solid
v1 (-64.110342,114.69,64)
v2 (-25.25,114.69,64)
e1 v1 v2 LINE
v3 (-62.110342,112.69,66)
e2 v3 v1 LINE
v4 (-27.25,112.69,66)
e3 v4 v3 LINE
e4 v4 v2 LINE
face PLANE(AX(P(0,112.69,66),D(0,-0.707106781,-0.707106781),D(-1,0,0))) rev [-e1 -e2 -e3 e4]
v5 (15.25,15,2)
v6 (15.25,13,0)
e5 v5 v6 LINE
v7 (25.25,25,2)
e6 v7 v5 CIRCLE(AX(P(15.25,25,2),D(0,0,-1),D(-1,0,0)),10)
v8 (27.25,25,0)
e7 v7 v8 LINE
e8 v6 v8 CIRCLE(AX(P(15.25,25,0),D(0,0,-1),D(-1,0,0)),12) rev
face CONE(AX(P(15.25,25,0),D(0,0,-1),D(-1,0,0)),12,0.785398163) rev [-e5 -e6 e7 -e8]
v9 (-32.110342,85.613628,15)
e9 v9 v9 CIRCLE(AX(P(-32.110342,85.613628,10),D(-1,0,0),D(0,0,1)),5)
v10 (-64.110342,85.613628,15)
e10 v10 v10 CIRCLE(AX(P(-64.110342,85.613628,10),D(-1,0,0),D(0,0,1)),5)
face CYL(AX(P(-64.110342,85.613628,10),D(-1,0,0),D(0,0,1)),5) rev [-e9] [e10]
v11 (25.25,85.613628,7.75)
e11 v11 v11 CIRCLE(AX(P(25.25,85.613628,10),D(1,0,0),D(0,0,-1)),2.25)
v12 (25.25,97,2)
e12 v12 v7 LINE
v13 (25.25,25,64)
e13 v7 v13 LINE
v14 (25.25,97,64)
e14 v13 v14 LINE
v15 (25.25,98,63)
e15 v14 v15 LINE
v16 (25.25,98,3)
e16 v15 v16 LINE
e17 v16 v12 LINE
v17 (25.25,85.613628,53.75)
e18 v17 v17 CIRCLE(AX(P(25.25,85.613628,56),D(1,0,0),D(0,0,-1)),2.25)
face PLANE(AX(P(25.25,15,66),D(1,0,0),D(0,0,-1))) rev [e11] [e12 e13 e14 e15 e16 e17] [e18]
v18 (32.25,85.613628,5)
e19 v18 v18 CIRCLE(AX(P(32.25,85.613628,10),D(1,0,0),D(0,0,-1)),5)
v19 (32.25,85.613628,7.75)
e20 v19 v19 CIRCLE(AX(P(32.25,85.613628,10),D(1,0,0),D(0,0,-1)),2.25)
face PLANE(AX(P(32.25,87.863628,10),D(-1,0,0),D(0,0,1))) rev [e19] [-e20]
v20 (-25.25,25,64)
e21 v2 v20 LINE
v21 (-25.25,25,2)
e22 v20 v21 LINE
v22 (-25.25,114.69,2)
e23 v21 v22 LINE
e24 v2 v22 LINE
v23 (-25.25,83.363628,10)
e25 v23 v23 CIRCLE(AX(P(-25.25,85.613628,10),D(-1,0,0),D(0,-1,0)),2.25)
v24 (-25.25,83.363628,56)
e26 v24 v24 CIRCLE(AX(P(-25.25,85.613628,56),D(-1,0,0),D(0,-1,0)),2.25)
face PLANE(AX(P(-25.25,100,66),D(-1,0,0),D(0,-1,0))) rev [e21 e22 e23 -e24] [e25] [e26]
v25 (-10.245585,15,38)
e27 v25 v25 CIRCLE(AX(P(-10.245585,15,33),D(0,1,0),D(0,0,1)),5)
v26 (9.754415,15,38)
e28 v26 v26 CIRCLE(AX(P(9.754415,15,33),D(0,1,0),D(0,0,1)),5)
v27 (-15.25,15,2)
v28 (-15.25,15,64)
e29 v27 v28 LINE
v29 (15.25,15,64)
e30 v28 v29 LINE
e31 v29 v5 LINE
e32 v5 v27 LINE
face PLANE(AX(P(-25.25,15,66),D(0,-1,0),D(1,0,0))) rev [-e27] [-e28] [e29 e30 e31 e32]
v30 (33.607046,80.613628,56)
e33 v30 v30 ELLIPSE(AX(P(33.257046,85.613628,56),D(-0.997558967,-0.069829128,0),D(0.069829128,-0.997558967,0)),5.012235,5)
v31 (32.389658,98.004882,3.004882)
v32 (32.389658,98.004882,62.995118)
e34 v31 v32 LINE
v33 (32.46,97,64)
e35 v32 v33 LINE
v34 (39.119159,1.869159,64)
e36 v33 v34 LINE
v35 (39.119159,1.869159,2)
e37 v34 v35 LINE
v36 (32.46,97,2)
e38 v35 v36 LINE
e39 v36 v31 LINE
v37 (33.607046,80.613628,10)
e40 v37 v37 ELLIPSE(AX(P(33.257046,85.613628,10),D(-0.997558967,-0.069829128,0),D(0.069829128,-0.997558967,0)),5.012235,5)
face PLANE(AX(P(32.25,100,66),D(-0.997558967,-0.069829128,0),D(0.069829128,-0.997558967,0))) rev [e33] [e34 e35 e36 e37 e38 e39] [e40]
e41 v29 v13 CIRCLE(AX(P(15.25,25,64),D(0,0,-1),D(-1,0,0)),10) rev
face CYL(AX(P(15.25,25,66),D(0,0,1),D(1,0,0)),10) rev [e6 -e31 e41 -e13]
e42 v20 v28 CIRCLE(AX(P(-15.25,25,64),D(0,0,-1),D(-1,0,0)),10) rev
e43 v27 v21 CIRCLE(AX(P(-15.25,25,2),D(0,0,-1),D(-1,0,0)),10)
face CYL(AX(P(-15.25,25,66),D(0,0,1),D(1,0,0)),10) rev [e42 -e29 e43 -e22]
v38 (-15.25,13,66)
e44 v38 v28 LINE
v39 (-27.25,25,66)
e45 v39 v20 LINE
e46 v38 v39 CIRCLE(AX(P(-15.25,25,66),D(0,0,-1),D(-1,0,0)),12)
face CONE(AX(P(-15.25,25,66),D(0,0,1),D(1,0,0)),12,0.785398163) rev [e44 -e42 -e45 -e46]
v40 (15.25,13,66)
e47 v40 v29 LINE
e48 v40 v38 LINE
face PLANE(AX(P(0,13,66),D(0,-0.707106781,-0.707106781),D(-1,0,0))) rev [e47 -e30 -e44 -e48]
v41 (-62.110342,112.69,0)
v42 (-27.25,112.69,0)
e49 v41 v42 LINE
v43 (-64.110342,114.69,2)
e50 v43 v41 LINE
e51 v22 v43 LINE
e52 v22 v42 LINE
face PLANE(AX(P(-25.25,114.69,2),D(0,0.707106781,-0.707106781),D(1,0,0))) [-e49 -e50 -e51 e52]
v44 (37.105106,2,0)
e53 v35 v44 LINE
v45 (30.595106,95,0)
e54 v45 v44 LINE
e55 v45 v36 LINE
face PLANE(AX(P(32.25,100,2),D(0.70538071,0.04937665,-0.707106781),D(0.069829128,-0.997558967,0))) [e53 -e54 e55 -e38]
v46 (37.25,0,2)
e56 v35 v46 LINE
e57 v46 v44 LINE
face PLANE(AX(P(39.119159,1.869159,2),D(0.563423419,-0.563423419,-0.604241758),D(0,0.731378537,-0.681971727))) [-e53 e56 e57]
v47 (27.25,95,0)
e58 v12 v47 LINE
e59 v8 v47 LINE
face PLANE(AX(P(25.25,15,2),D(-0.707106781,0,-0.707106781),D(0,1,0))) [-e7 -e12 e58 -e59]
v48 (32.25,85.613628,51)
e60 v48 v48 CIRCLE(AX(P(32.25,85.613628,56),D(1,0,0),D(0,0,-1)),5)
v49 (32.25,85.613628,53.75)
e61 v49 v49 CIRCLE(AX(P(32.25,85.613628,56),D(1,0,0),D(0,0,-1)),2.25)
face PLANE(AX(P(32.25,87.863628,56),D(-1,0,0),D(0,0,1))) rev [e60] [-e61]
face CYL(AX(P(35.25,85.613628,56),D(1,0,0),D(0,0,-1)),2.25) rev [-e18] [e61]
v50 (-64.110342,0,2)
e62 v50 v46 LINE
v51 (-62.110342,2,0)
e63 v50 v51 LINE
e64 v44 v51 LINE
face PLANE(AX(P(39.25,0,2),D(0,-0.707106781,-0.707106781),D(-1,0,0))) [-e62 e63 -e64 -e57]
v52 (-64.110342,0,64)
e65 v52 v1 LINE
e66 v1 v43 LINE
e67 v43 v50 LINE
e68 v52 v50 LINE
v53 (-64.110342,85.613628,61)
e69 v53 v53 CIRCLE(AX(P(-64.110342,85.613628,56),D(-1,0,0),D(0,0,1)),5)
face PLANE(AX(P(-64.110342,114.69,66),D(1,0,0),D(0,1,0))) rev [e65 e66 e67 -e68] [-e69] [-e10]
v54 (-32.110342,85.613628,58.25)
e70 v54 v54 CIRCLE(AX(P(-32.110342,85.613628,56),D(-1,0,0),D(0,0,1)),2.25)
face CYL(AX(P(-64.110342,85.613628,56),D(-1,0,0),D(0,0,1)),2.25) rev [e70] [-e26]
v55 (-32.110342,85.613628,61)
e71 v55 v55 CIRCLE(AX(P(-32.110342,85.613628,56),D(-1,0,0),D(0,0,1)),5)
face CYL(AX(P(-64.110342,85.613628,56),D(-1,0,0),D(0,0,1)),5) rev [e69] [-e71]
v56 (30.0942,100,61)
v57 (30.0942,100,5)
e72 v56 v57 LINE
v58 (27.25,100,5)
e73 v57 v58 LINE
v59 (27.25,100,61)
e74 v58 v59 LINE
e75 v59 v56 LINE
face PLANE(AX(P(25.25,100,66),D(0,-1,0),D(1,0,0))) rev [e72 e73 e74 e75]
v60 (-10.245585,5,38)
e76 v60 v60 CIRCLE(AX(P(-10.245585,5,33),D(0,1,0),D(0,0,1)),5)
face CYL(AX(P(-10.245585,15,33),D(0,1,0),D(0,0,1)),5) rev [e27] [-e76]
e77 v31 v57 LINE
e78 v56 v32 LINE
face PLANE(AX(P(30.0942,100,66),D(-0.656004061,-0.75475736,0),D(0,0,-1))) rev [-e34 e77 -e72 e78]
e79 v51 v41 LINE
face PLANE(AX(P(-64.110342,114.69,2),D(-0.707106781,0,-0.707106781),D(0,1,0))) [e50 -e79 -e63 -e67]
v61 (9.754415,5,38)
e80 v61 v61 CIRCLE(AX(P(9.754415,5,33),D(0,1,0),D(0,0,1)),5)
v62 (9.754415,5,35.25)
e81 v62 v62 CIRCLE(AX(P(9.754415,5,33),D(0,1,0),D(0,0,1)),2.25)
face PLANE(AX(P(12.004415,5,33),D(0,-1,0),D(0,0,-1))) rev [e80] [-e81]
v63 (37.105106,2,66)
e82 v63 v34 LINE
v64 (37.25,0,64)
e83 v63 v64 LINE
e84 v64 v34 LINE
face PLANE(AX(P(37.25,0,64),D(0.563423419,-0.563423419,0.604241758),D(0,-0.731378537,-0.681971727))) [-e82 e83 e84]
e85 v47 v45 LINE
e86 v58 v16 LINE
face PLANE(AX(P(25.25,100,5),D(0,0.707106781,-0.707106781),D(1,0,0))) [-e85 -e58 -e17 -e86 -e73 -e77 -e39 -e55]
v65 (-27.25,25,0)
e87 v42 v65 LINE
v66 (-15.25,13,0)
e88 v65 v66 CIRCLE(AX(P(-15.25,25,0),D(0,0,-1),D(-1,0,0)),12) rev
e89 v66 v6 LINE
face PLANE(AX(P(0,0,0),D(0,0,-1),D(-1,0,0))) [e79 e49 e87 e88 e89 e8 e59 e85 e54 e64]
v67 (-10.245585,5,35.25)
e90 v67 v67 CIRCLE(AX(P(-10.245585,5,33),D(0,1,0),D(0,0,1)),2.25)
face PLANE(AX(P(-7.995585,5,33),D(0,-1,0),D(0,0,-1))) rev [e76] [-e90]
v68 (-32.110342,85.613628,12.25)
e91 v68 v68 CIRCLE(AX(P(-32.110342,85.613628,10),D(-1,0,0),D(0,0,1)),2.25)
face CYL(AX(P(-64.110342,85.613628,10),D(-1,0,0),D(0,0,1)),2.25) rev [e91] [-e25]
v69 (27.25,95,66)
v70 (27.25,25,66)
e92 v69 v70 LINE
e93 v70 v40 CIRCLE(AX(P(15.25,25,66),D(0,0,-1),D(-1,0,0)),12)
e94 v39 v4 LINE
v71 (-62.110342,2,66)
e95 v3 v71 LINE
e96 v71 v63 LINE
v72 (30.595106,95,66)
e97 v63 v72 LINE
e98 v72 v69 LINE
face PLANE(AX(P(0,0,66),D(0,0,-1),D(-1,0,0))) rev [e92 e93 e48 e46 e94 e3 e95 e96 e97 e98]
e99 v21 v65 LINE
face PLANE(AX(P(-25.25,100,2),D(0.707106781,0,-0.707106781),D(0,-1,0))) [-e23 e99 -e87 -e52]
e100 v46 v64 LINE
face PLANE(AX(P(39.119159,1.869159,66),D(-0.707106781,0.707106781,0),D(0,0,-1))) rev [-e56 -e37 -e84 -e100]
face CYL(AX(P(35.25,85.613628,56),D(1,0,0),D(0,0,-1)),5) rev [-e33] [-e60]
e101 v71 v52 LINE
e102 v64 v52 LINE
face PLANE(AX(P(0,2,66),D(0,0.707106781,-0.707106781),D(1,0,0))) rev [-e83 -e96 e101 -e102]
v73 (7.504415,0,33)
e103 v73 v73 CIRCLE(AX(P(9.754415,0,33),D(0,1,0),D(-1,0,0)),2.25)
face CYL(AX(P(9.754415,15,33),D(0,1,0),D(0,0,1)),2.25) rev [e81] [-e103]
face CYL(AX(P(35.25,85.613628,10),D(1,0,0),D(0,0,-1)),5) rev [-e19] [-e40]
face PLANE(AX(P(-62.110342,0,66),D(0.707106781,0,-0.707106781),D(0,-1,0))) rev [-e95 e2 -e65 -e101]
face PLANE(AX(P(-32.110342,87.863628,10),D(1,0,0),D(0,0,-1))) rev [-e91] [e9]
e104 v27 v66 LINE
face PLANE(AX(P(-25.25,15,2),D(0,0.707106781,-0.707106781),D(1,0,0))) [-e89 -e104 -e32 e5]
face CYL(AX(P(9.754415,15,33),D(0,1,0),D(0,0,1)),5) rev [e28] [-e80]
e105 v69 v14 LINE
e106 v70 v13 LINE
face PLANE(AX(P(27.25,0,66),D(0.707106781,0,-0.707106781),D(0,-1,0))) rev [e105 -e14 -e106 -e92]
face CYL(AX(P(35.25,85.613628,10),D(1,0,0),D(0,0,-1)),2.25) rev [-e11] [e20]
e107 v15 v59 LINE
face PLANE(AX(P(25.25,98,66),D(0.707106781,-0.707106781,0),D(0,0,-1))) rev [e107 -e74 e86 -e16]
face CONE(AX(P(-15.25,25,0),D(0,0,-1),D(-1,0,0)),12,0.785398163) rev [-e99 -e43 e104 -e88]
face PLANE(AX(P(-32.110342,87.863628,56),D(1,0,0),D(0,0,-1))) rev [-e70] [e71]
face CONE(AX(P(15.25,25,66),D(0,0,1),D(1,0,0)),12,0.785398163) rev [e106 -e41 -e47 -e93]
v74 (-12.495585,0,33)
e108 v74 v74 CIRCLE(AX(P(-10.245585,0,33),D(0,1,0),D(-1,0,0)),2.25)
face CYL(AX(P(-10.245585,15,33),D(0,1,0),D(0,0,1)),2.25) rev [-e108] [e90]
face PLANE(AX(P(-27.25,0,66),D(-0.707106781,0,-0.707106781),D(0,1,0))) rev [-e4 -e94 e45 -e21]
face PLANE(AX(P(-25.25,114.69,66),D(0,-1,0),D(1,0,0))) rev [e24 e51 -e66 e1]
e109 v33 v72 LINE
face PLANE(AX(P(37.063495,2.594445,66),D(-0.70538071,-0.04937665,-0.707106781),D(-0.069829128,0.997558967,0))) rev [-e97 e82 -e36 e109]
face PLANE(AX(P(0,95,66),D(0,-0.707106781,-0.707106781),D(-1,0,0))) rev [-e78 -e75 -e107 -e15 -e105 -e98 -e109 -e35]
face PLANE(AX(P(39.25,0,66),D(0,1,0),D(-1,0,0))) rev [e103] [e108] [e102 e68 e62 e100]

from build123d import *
from OCP.BRepFilletAPI import BRepFilletAPI_MakeChamfer

# Parameters (mm, degrees)
ESTRUSIONE_ESTRUSIONE1_DEPTH                         = 66
RACCORDO1_R                                          = 10
SMUSSO1_SIZE                                         = 2
SMUSSO1_SIZE2                                        = 2.155800013
SMUSSO1_SIZE2_2                                      = 1.873732722
SMUSSO2_SIZE                                         = 5
FORO_LAMATO_PER_VITE_M4_A_TESTA_CILINDRI_D           = 4.5
FORO_LAMATO_PER_VITE_M4_A_TESTA_CILINDRI_DEPTH       = 30
FORO_LAMATO_PER_VITE_M4_A_TESTA_CILINDRI_CBORE_D     = 10
FORO_LAMATO_PER_VITE_M4_A_TESTA_CILINDRI_CBORE_DEPTH = 3
FORO_LAMATO_PER_VITE_M4_A_TESTA_CILINDRI_TIP         = 1.351936393
FORO_LAMATO_PER_VITE_M4_A_TESTA_CILI_2_D             = 4.5
FORO_LAMATO_PER_VITE_M4_A_TESTA_CILI_2_DEPTH         = 30
FORO_LAMATO_PER_VITE_M4_A_TESTA_CILI_2_CBORE_D       = 10
FORO_LAMATO_PER_VITE_M4_A_TESTA_CILI_2_CBORE_DEPTH   = 10
FORO_LAMATO_PER_VITE_M4_A_TESTA_CILI_2_TIP           = 1.351936393
FORO_LAMATO_PER_VITE_M4_A_TESTA_CILI_3_D             = 4.5
FORO_LAMATO_PER_VITE_M4_A_TESTA_CILI_3_DEPTH         = 45
FORO_LAMATO_PER_VITE_M4_A_TESTA_CILI_3_CBORE_D       = 10
FORO_LAMATO_PER_VITE_M4_A_TESTA_CILI_3_CBORE_DEPTH   = 32
FORO_LAMATO_PER_VITE_M4_A_TESTA_CILI_3_TIP           = 1.351936393


with BuildPart() as part:
    # Schizzo1 → Estrusione-Estrusione1 (new body)
    with BuildSketch(Plane.XY):
        Polygon((25.25, 100), (32.25, 100), (39.25, 0), (-39.25, 0), (-64.110342, 0), (-64.110342, 114.69), (-25.25, 114.69), (-25.25, 100), (-25.25, 15), (25.25, 15), align=None)
    extrude(amount=ESTRUSIONE_ESTRUSIONE1_DEPTH)

    # Raccordo1
    raccordo1_edges = [part.edges().sort_by_distance(p)[0] for p in [
        (-25.25, 15, 33),
        (25.25, 15, 33),
    ]]
    fillet(raccordo1_edges, radius=RACCORDO1_R)

    # Smusso1: one chamfer whose edges measure the first distance from different faces: ONE call of the kernel's chamfer builder (chamfer() names one face for all edges)
    smusso1_edges_1 = [part.edges().sort_by_distance(p)[0] for p in [
        (35.75, 50, 0),
        (-12.430171, 0, 0),
        (-64.110342, 57.345, 0),
        (-44.680171, 114.69, 0),
        (25.25, 62.5, 0),
        (25.25, 100, 33),
        (-44.680171, 114.69, 66),
        (-64.110342, 57.345, 66),
        (-12.430171, 0, 66),
        (-25.25, 69.845, 0),
        (-25.25, 69.845, 66),
        (0, 15, 0),
        (0, 15, 66),
        (-22.321067812, 17.928932188, 0),
        (-22.321067812, 17.928932188, 66),
        (35.75, 50, 66),
        (22.321067812, 17.928932188, 0),
        (22.321067812, 17.928932188, 66),
        (25.25, 62.5, 66),
    ]]
    smusso1_edges_2 = [part.edges().sort_by_distance(p)[0] for p in [
        (32.25, 100, 33),
    ]]
    smusso1_side_2 = [part.faces().sort_by_distance(p)[0] for p in [
        (35.75, 50, 33),
    ]]
    smusso1_edges_3 = [part.edges().sort_by_distance(p)[0] for p in [
        (39.25, 0, 33),
    ]]
    smusso1_side_3 = [part.faces().sort_by_distance(p)[0] for p in [
        (-12.430171, 0, 33),
    ]]
    smusso1 = BRepFilletAPI_MakeChamfer(part.part.solid().wrapped)
    for e in smusso1_edges_1:
        smusso1.Add(SMUSSO1_SIZE, e.wrapped)
    for e in smusso1_edges_2:
        smusso1.Add(SMUSSO1_SIZE, SMUSSO1_SIZE2, e.wrapped, smusso1_side_2[0].wrapped)  # the first distance lies on this face
    for e in smusso1_edges_3:
        smusso1.Add(SMUSSO1_SIZE, SMUSSO1_SIZE2_2, e.wrapped, smusso1_side_3[0].wrapped)  # the first distance lies on this face
    add(Compound.cast(smusso1.Shape()), mode=Mode.REPLACE)

    # Smusso2
    # the kernel refuses this chamfer: 5 mm, written as the material it takes off along each edge
    with BuildSketch(Plane(origin=(14.39158506, 100, 66), x_dir=(2.02935454733688e-15, -0.9996219169112968, 0.027495876610587663), z_dir=(1, 0, 0)), Plane(origin=(14.39158506, 100, 0), x_dir=(0, 0.0274958766105877, 0.9996219169112968), z_dir=(1, 0, 0))) as smusso2_piece_1:
        Polygon((SMUSSO2_SIZE * 0.999621916911, SMUSSO2_SIZE * 0.0274958766106), (-SMUSSO2_SIZE * 0.0274958766106, SMUSSO2_SIZE * 0.999621916911), (0, 0), align=None)
    extrude(amount=28.561029867, mode=Mode.SUBTRACT)

    # Foro lamato per Vite M4 a testa cilindri
    with Locations(Plane(origin=(35.25, 0, 0), x_dir=(0, 0, 1), z_dir=(1, 0, 0))):
        with Locations((56, -85.613628), (10, -85.613628)):
            CounterBoreHole(FORO_LAMATO_PER_VITE_M4_A_TESTA_CILINDRI_D / 2, FORO_LAMATO_PER_VITE_M4_A_TESTA_CILINDRI_CBORE_D / 2, FORO_LAMATO_PER_VITE_M4_A_TESTA_CILINDRI_CBORE_DEPTH, depth=FORO_LAMATO_PER_VITE_M4_A_TESTA_CILINDRI_DEPTH)
            with Locations((0, 0, -(FORO_LAMATO_PER_VITE_M4_A_TESTA_CILINDRI_DEPTH + FORO_LAMATO_PER_VITE_M4_A_TESTA_CILINDRI_TIP / 2))):  # 118° drill point
                Cone(0, FORO_LAMATO_PER_VITE_M4_A_TESTA_CILINDRI_D / 2, FORO_LAMATO_PER_VITE_M4_A_TESTA_CILINDRI_TIP, mode=Mode.SUBTRACT)

    # Foro lamato per Vite M4 a testa cili 2
    with Locations(Plane(origin=(0, 15, 0), x_dir=(1, 0, 0), z_dir=(0, 1, 0))):
        with Locations((-10.245584981, -33), (9.754415019, -33)):
            CounterBoreHole(FORO_LAMATO_PER_VITE_M4_A_TESTA_CILI_2_D / 2, FORO_LAMATO_PER_VITE_M4_A_TESTA_CILI_2_CBORE_D / 2, FORO_LAMATO_PER_VITE_M4_A_TESTA_CILI_2_CBORE_DEPTH, depth=FORO_LAMATO_PER_VITE_M4_A_TESTA_CILI_2_DEPTH)
            with Locations((0, 0, -(FORO_LAMATO_PER_VITE_M4_A_TESTA_CILI_2_DEPTH + FORO_LAMATO_PER_VITE_M4_A_TESTA_CILI_2_TIP / 2))):  # 118° drill point
                Cone(0, FORO_LAMATO_PER_VITE_M4_A_TESTA_CILI_2_D / 2, FORO_LAMATO_PER_VITE_M4_A_TESTA_CILI_2_TIP, mode=Mode.SUBTRACT)

    # Foro lamato per Vite M4 a testa cili 3
    with Locations(Plane.ZY.offset(64.110342)):
        with Locations((10, 85.613628), (56, 85.613628)):
            CounterBoreHole(FORO_LAMATO_PER_VITE_M4_A_TESTA_CILI_3_D / 2, FORO_LAMATO_PER_VITE_M4_A_TESTA_CILI_3_CBORE_D / 2, FORO_LAMATO_PER_VITE_M4_A_TESTA_CILI_3_CBORE_DEPTH, depth=FORO_LAMATO_PER_VITE_M4_A_TESTA_CILI_3_DEPTH)
            with Locations((0, 0, -(FORO_LAMATO_PER_VITE_M4_A_TESTA_CILI_3_DEPTH + FORO_LAMATO_PER_VITE_M4_A_TESTA_CILI_3_TIP / 2))):  # 118° drill point
                Cone(0, FORO_LAMATO_PER_VITE_M4_A_TESTA_CILI_3_D / 2, FORO_LAMATO_PER_VITE_M4_A_TESTA_CILI_3_TIP, mode=Mode.SUBTRACT)


solid = part.part
